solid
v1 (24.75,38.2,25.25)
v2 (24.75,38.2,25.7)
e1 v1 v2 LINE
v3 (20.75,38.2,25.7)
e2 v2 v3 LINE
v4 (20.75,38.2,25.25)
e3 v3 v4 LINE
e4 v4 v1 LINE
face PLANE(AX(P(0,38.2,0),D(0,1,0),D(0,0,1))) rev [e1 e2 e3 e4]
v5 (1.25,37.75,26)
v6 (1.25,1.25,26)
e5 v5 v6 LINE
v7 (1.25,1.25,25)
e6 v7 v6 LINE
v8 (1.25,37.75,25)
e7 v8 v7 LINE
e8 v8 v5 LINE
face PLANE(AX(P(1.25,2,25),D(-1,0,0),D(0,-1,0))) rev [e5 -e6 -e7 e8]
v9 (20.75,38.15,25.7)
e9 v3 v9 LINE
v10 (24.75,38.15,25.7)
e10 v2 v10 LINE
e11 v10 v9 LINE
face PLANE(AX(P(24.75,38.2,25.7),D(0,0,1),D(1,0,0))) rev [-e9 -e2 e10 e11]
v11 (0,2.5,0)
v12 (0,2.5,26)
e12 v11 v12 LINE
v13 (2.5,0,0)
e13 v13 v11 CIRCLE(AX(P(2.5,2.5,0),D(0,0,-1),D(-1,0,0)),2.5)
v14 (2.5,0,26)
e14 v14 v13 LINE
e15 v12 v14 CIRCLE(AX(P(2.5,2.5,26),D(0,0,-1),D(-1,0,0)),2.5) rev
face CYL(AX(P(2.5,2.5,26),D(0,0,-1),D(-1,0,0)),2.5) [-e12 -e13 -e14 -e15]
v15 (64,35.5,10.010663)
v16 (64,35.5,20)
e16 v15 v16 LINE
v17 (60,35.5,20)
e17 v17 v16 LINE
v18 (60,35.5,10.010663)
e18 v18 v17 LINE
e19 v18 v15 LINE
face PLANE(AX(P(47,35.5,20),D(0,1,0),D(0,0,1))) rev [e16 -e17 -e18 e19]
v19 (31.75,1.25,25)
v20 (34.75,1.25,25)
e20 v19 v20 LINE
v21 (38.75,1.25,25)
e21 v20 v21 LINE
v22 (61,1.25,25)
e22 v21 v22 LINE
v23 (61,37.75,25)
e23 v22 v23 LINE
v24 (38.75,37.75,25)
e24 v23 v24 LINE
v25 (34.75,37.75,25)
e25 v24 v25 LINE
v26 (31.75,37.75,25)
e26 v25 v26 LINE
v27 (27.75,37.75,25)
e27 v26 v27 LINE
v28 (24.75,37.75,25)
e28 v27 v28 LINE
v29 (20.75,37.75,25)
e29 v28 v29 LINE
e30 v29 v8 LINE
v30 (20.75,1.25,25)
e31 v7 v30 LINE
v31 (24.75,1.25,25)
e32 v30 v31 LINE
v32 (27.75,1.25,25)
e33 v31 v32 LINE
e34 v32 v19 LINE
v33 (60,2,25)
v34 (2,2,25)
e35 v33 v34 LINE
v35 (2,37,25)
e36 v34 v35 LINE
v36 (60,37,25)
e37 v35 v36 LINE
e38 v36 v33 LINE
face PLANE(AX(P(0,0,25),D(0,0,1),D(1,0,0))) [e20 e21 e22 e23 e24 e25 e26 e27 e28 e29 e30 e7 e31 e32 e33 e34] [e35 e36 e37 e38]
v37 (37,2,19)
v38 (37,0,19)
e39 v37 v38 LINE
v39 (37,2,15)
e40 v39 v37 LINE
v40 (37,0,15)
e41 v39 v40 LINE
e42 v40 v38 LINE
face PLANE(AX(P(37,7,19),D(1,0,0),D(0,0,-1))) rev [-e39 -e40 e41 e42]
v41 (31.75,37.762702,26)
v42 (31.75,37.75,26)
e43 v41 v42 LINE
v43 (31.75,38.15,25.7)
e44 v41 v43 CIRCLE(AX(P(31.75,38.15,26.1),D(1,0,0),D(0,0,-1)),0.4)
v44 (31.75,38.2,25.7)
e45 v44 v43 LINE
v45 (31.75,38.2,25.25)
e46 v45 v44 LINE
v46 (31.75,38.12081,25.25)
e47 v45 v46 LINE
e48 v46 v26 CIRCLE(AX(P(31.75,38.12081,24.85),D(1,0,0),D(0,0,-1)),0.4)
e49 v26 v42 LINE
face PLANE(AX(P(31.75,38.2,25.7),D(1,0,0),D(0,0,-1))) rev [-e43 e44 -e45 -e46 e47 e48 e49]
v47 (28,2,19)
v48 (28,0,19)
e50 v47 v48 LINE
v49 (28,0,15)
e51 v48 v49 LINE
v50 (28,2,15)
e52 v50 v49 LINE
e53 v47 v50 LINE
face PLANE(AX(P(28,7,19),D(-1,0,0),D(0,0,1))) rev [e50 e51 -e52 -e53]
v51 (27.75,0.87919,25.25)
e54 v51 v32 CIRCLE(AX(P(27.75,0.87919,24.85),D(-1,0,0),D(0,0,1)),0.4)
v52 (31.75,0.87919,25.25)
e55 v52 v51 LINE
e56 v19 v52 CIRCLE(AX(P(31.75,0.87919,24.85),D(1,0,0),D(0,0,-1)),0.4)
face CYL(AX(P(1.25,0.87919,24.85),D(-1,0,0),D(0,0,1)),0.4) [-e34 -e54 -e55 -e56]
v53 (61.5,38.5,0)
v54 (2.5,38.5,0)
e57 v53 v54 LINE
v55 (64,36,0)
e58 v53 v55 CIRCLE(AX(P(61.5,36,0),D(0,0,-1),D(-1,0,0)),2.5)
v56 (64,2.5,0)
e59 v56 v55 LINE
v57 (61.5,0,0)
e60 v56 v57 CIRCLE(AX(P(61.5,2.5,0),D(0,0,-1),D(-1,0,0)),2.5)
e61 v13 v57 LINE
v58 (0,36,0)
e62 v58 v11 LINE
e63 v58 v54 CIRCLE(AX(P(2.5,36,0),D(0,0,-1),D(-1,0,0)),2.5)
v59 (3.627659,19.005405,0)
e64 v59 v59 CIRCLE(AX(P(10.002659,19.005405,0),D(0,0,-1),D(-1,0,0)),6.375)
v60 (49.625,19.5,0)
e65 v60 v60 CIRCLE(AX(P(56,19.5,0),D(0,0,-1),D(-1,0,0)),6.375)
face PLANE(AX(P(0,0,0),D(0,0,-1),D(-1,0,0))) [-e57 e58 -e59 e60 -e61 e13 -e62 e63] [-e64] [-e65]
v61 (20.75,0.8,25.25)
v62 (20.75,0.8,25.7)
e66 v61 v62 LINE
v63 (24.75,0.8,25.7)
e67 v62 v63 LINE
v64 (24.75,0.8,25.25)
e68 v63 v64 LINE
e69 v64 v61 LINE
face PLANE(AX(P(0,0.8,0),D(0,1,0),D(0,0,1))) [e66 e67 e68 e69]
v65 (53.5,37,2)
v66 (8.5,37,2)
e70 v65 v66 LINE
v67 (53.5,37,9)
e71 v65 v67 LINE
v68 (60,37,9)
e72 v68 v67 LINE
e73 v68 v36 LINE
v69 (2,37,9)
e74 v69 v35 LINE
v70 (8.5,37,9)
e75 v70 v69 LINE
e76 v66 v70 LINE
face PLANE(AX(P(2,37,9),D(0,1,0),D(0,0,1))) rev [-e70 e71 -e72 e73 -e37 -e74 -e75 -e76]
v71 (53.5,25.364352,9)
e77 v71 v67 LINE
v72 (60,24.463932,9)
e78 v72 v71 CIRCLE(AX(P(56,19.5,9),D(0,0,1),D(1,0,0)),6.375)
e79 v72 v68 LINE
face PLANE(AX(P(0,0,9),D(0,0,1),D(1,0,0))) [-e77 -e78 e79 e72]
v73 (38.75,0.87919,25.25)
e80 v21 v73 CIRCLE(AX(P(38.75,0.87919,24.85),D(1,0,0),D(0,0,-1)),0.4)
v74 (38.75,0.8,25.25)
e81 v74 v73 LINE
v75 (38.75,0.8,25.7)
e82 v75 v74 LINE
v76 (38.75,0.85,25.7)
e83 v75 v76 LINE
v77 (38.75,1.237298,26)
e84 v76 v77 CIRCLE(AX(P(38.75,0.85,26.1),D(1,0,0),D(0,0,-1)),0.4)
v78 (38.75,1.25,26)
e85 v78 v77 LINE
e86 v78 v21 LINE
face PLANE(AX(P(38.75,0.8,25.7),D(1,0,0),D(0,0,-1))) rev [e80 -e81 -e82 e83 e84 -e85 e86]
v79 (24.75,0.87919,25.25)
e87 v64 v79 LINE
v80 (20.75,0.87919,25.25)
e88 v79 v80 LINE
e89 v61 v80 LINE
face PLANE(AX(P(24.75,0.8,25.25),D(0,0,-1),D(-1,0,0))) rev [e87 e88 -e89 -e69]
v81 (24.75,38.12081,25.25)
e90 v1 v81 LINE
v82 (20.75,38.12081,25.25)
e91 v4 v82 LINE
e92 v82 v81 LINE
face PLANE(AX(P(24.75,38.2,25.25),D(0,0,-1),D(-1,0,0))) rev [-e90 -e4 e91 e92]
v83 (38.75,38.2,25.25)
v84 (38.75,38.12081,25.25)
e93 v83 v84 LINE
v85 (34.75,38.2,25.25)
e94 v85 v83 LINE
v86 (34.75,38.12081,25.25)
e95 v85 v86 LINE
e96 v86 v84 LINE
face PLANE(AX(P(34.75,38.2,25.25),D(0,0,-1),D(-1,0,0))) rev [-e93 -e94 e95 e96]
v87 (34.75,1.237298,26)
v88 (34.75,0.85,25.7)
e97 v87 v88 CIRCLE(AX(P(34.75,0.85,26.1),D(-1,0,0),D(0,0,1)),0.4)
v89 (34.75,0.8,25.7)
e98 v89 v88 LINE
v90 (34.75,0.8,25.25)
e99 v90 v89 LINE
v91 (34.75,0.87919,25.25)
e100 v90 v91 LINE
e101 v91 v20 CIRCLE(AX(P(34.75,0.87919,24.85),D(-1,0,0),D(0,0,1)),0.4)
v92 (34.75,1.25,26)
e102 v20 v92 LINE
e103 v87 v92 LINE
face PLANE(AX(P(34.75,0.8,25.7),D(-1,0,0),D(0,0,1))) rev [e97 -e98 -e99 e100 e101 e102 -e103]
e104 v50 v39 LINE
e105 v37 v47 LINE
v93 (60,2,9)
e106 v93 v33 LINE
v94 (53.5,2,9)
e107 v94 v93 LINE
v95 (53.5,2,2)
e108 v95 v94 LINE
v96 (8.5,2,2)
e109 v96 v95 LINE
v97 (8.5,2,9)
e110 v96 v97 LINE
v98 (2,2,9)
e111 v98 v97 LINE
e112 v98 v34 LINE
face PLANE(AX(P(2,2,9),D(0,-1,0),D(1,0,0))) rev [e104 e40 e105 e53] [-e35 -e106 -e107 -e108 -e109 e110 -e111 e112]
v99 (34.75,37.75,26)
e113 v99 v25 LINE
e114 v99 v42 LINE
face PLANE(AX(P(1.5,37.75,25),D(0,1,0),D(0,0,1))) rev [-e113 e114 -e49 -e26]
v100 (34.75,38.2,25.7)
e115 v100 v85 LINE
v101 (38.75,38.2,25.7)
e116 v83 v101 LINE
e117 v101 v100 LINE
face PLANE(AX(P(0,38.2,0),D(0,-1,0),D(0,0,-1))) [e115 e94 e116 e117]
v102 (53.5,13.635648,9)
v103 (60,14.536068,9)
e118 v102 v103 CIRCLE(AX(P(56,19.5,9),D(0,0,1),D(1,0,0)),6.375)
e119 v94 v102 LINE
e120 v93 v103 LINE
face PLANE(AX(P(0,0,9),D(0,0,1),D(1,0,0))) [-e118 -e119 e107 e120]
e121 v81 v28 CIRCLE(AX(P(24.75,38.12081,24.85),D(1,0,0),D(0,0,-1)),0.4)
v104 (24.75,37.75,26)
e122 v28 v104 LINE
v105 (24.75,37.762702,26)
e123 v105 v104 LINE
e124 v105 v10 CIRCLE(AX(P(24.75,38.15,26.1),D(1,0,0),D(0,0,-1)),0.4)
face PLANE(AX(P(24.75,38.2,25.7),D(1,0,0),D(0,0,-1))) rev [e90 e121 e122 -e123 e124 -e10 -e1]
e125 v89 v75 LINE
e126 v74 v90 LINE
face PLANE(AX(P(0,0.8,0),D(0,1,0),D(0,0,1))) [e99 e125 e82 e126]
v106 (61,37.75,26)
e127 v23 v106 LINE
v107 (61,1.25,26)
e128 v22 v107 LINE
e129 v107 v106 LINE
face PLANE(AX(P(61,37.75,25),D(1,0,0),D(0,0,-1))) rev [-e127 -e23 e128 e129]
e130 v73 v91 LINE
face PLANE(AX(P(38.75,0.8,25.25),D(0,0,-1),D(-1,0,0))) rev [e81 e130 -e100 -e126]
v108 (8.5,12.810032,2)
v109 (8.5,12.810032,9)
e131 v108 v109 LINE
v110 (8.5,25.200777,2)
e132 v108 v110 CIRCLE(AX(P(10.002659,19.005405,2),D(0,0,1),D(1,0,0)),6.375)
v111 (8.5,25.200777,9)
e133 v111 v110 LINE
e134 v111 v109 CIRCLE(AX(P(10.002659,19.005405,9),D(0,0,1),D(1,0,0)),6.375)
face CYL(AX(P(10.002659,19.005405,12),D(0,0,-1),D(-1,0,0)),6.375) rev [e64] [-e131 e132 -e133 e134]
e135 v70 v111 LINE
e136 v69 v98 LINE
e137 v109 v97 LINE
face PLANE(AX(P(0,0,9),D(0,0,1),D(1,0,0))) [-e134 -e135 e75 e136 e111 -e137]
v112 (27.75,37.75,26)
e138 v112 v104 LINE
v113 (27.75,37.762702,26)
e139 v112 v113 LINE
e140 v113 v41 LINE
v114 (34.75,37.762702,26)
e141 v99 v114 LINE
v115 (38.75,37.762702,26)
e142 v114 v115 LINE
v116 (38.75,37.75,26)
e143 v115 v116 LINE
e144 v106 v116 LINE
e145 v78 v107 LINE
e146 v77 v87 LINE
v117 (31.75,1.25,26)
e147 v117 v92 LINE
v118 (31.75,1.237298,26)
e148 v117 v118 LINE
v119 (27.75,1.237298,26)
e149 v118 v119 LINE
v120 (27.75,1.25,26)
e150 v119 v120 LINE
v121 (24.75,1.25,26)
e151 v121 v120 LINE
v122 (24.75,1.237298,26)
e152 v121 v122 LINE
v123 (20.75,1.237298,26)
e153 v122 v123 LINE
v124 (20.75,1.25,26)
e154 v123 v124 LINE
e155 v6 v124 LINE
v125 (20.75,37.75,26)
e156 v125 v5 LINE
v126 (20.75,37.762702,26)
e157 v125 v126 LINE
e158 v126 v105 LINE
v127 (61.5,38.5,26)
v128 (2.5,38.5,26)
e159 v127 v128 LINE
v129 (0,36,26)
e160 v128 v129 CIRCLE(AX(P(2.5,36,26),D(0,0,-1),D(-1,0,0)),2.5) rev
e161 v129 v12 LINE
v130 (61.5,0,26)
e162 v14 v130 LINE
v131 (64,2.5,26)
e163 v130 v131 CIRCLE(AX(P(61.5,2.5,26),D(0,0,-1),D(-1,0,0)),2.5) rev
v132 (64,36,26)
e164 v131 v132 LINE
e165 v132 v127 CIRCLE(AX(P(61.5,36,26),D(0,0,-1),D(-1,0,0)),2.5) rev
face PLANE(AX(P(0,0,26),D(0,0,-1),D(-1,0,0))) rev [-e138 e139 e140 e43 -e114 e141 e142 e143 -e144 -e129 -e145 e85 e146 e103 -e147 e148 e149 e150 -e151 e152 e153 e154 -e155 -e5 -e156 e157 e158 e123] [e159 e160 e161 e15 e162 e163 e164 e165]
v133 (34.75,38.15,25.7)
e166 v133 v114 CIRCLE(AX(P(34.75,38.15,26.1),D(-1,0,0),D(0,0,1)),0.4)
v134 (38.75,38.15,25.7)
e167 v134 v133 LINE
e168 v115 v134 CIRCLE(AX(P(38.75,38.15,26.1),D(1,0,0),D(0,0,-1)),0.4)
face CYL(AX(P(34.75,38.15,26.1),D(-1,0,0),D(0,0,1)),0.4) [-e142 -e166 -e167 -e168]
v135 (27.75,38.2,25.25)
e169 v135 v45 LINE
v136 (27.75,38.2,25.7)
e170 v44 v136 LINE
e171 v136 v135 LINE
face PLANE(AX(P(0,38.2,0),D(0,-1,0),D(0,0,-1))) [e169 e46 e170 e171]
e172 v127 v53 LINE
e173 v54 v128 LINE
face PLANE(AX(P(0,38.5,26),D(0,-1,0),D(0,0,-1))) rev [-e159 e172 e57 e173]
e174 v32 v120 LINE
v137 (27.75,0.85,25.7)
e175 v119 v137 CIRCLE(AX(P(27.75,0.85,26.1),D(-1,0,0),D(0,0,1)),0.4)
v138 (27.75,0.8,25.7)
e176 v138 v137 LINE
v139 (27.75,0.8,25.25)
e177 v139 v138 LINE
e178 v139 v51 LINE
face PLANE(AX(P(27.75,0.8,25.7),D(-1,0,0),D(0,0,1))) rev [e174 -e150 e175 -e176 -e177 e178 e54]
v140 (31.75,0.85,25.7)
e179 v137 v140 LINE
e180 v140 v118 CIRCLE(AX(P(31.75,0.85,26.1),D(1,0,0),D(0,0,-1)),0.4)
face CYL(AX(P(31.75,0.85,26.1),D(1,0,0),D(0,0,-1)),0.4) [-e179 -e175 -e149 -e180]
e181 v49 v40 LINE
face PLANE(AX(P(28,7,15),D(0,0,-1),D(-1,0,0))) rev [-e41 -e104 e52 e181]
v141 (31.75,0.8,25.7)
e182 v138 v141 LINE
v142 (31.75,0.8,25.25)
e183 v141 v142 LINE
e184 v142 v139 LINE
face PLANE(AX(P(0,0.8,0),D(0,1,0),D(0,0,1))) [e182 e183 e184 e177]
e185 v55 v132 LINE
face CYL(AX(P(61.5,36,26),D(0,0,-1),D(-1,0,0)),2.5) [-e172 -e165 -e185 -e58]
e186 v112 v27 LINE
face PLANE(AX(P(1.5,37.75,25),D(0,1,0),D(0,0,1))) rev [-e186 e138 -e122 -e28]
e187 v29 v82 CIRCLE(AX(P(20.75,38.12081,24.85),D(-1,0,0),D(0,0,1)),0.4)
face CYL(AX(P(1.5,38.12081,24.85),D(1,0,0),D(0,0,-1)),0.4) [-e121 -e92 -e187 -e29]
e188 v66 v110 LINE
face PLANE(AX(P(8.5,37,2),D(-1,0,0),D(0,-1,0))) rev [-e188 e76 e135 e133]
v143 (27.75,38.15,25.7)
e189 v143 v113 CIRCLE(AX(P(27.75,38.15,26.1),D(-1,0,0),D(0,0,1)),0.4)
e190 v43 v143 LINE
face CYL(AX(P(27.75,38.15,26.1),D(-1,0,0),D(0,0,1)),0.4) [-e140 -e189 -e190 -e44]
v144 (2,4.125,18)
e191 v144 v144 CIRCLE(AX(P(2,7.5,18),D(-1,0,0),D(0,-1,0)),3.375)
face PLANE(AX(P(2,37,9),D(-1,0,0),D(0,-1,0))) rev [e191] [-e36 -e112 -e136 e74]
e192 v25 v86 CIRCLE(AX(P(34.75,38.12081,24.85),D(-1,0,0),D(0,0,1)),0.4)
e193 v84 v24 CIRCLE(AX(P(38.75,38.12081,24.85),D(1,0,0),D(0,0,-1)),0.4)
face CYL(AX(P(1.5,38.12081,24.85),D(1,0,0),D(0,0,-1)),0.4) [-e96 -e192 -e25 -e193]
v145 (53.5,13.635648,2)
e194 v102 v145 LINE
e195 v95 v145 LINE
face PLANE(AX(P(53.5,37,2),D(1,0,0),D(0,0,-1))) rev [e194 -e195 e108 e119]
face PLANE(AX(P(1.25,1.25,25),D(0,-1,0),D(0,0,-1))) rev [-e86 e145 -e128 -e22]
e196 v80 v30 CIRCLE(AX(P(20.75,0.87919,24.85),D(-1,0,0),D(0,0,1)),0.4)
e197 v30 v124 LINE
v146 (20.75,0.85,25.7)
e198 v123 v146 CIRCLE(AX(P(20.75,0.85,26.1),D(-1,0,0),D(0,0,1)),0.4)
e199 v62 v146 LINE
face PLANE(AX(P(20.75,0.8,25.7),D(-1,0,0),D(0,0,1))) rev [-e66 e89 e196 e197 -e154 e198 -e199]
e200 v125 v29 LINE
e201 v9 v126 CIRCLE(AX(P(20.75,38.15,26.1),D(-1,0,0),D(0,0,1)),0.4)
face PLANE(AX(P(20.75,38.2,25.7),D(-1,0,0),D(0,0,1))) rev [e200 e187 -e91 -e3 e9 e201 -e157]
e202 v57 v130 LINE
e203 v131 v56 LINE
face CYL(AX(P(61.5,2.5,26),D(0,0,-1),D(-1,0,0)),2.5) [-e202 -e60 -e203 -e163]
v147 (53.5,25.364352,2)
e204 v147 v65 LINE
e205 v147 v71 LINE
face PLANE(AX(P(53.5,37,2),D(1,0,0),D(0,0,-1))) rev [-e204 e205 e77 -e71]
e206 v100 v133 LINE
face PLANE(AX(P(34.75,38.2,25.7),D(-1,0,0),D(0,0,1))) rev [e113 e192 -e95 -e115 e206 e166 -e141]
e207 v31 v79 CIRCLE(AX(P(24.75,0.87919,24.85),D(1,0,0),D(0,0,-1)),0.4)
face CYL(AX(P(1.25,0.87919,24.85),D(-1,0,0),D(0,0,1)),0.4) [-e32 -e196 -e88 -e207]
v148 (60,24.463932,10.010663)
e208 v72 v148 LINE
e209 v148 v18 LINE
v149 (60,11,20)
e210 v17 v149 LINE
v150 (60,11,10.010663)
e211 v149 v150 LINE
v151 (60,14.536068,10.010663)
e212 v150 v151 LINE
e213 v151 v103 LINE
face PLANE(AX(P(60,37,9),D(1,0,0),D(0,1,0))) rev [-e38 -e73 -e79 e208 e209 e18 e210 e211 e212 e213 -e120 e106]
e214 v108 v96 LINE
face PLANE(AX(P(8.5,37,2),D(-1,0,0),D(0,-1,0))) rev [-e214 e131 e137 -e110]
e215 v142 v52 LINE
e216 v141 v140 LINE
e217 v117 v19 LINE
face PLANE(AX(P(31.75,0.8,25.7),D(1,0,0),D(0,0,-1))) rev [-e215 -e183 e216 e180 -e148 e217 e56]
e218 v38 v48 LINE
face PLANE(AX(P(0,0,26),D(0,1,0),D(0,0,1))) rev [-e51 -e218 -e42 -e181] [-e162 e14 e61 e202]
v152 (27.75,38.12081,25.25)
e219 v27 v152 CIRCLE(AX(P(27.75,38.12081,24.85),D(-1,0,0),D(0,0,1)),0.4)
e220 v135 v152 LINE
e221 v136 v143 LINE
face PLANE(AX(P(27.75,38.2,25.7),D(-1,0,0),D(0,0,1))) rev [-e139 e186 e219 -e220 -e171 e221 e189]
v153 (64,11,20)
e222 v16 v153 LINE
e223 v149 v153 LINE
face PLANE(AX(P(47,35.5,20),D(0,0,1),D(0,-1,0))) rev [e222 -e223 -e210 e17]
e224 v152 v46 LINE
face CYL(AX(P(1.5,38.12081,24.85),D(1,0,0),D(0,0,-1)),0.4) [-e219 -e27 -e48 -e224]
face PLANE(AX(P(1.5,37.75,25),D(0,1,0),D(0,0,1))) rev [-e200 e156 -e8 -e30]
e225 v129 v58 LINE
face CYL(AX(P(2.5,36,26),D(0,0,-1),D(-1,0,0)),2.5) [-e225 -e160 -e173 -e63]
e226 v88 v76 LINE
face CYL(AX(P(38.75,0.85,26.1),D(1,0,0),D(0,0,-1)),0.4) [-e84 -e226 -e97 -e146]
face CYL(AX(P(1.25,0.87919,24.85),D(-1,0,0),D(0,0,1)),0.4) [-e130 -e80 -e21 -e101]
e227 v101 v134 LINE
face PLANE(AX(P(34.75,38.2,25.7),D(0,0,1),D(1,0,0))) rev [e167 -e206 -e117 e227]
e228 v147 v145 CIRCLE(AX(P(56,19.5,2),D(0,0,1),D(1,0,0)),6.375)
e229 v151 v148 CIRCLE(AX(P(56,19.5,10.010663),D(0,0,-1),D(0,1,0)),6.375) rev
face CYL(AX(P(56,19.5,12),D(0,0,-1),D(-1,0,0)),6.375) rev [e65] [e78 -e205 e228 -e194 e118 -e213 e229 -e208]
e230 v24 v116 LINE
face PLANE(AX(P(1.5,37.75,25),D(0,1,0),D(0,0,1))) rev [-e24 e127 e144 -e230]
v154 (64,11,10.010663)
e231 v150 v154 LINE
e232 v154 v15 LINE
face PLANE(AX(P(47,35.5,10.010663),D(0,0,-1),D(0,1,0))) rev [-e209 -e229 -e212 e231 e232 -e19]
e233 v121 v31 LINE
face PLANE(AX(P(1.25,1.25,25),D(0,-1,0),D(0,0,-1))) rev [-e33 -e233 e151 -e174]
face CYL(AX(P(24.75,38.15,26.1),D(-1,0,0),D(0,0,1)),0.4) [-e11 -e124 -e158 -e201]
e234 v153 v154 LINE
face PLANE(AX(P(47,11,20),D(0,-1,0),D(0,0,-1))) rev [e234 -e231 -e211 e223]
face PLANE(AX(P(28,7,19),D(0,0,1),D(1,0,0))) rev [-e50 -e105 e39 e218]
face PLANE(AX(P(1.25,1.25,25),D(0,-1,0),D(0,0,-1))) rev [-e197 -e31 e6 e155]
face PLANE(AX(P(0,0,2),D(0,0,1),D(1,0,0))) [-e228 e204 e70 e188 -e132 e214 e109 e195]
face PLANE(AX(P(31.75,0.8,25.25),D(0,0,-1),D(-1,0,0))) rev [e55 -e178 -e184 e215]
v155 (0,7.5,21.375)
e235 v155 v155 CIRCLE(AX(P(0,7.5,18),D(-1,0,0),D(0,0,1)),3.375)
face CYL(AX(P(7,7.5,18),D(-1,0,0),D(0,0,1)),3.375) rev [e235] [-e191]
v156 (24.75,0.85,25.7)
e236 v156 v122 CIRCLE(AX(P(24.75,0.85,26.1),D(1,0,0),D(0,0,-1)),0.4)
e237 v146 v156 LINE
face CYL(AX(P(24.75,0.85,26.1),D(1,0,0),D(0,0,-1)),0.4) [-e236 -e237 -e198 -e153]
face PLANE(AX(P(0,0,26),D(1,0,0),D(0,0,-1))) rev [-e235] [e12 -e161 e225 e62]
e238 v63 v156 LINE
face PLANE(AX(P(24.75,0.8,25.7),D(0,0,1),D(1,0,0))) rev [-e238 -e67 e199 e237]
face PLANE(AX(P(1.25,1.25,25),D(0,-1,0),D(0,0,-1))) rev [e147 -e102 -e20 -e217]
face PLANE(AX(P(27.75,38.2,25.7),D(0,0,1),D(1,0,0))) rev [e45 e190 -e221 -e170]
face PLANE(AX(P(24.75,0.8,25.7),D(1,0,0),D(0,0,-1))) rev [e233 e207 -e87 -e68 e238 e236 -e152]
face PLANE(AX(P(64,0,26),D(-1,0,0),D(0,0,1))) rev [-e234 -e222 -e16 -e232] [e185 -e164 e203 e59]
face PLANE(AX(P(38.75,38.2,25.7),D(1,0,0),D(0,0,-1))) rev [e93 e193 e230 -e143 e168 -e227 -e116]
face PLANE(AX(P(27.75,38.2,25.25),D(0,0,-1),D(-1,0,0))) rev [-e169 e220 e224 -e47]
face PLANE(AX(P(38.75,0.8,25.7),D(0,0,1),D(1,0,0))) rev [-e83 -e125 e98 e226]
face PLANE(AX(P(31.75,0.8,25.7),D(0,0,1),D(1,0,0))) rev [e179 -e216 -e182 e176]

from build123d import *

# Parameters (mm, degrees)
SKETCH1_W           = 64
SKETCH1_H           = 38.5
BOSS_EXTRUDE1_DEPTH = 26
SKETCH2_W           = 58
SKETCH2_H           = 35
CUT_EXTRUDE1_DEPTH  = 17
SKETCH4_W           = 45
SKETCH4_H           = 35
CUT_EXTRUDE3_DEPTH  = 7
SKETCH5_R           = 6.375
CUT_EXTRUDE4_DEPTH  = 12
SKETCH6_W           = 9.989337028
SKETCH6_H           = 24.5
CUT_EXTRUDE5_DEPTH  = 17
SKETCH7_R           = 3.375
CUT_EXTRUDE6_DEPTH  = 7
SKETCH8_W           = 9
SKETCH8_H           = 4
CUT_EXTRUDE7_DEPTH  = 7
FILLET1_R           = 2.5
SKETCH10_W          = 59.5
SKETCH10_H          = 0.75
CUT_EXTRUDE8_DEPTH  = 1
SKETCH11_W          = 59.75
SKETCH11_H          = 0.75
CUT_EXTRUDE9_DEPTH  = 1
SKETCH12_W          = 1
SKETCH12_H          = 36.5
SKETCH12_W_2        = 0.75
CUT_EXTRUDE10_DEPTH = 1
SKETCH13_W          = 4
SKETCH13_H          = 0.45
CUT_EXTRUDE11_DEPTH = 0.45
FILLET2_R           = 0.4
SKETCH14_W          = 4
SKETCH14_H          = 0.45
CUT_EXTRUDE12_DEPTH = 0.45
FILLET3_R           = 0.4


with BuildPart() as part:
    # Sketch1 → Boss-Extrude1 (new body)
    with BuildSketch(Plane.XY):
        with Locations((32, 19.25)):
            Rectangle(SKETCH1_W, SKETCH1_H)
    extrude(amount=BOSS_EXTRUDE1_DEPTH)

    # Sketch2 → Cut-Extrude1 (cut)
    with BuildSketch(Plane.XY.offset(26)):
        with Locations((31, 19.5)):
            Rectangle(SKETCH2_W, SKETCH2_H)
    extrude(amount=-CUT_EXTRUDE1_DEPTH, mode=Mode.SUBTRACT)

    # Sketch4 → Cut-Extrude3 (cut)
    with BuildSketch(Plane.XY.offset(9)):
        with Locations((31, 19.5)):
            Rectangle(SKETCH4_W, SKETCH4_H)
    extrude(amount=-CUT_EXTRUDE3_DEPTH, mode=Mode.SUBTRACT)

    # Sketch5 → Cut-Extrude4 (cut)
    with BuildSketch(Plane(origin=(0, 0, 0), x_dir=(-1, 0, 0), z_dir=(0, 0, -1))):
        with Locations((-56, 19.5)):
            Circle(SKETCH5_R)
        with Locations((-10.002659036, 19.005404936)):
            Circle(SKETCH5_R)
    extrude(amount=-CUT_EXTRUDE4_DEPTH, mode=Mode.SUBTRACT)

    # Sketch6 → Cut-Extrude5 (cut)
    with BuildSketch(Plane(origin=(64, 0, 0), x_dir=(0, 0, -1), z_dir=(1, 0, 0))):
        with Locations((-15.005331486, 23.25)):
            Rectangle(SKETCH6_W, SKETCH6_H)
    extrude(amount=-CUT_EXTRUDE5_DEPTH, mode=Mode.SUBTRACT)

    # Sketch7 → Cut-Extrude6 (cut)
    with BuildSketch(Plane.ZY):
        with Locations((18, 7.5)):
            Circle(SKETCH7_R)
    extrude(amount=-CUT_EXTRUDE6_DEPTH, mode=Mode.SUBTRACT)

    # Sketch8 → Cut-Extrude7 (cut)
    with BuildSketch(Plane.XZ):
        with Locations((32.5, 17)):
            Rectangle(SKETCH8_W, SKETCH8_H)
    extrude(amount=-CUT_EXTRUDE7_DEPTH, mode=Mode.SUBTRACT)

    # Fillet1
    fillet1_edges = [part.edges().sort_by_distance(p)[0] for p in [
        (0, 38.5, 13),
        (64, 38.5, 13),
        (64, 0, 13),
        (0, 0, 13),
    ]]
    fillet(fillet1_edges, radius=FILLET1_R)

    # Sketch10 → Cut-Extrude8 (cut)
    with BuildSketch(Plane.XY.offset(26)):
        with Locations((31.25, 37.375)):
            Rectangle(SKETCH10_W, SKETCH10_H)
    extrude(amount=-CUT_EXTRUDE8_DEPTH, mode=Mode.SUBTRACT)

    # Sketch11 → Cut-Extrude9 (cut)
    with BuildSketch(Plane.XY.offset(26)):
        with Locations((31.125, 1.625)):
            Rectangle(SKETCH11_W, SKETCH11_H)
    extrude(amount=-CUT_EXTRUDE9_DEPTH, mode=Mode.SUBTRACT)

    # Sketch12 → Cut-Extrude10 (cut)
    with BuildSketch(Plane.XY.offset(26)):
        with Locations((60.5, 19.5)):
            Rectangle(SKETCH12_W, SKETCH12_H)
        with Locations((1.625, 19.5)):
            Rectangle(SKETCH12_W_2, SKETCH12_H)
    extrude(amount=-CUT_EXTRUDE10_DEPTH, mode=Mode.SUBTRACT)

    # Sketch13 → Cut-Extrude11 (cut)
    with BuildSketch(Plane(origin=(0, 1.25, 0), x_dir=(1, 0, 0), z_dir=(0, 1, 0))):
        with Locations((29.75, -25.475)):
            Rectangle(SKETCH13_W, SKETCH13_H)
        with Locations((22.75, -25.475)):
            Rectangle(SKETCH13_W, SKETCH13_H)
        with Locations((36.75, -25.475)):
            Rectangle(SKETCH13_W, SKETCH13_H)
    extrude(amount=-CUT_EXTRUDE11_DEPTH, mode=Mode.SUBTRACT)

    # Fillet2
    # the kernel refuses this fillet: 0.4 mm, written as the material it takes off along each edge
    with BuildSketch(Plane(origin=(34.75, 1.25, 25.25), x_dir=(0, 0, -1), z_dir=(1, 0, 0)), Plane(origin=(20.75, 1.25, 25.25), x_dir=(0, 0, -1), z_dir=(1, 0, 0)), Plane(origin=(27.75, 1.25, 25.25), x_dir=(0, 0, -1), z_dir=(1, 0, 0))) as fillet2_piece_1:
        with BuildLine():
            CenterArc((0.4, -0.370809924), FILLET2_R, 112.024312837, 67.975687163)
            Line((0, -0.370809924), (0, 0))
            Line((0, 0), (0.25, 0))
        make_face()
    extrude(amount=4, mode=Mode.SUBTRACT)
    with BuildSketch(Plane(origin=(38.75, 1.25, 25.7), x_dir=(0, 0, 1), z_dir=(-1, 0, 0)), Plane(origin=(24.75, 1.25, 25.7), x_dir=(0, 0, 1), z_dir=(-1, 0, 0)), Plane(origin=(31.75, 1.25, 25.7), x_dir=(0, 0, 1), z_dir=(-1, 0, 0))) as fillet2_piece_2:
        with BuildLine():
            CenterArc((FILLET2_R, -FILLET2_R), FILLET2_R, 90, 90)
            Line((0, -FILLET2_R), (0, 0))
            Line((0, 0), (FILLET2_R, 0))
        make_face()
    extrude(amount=4, mode=Mode.SUBTRACT)

    # Sketch14 → Cut-Extrude12 (cut)
    with BuildSketch(Plane.XZ.offset(-37.75)):
        with Locations((29.75, 25.475)):
            Rectangle(SKETCH14_W, SKETCH14_H)
        with Locations((36.75, 25.475)):
            Rectangle(SKETCH14_W, SKETCH14_H)
        with Locations((22.75, 25.475)):
            Rectangle(SKETCH14_W, SKETCH14_H)
    extrude(amount=-CUT_EXTRUDE12_DEPTH, mode=Mode.SUBTRACT)

    # Fillet3
    # the kernel refuses this fillet: 0.4 mm, written as the material it takes off along each edge
    with BuildSketch(Plane(origin=(24.75, 37.75, 25.7), x_dir=(0, 0, 1), z_dir=(-1, 0, 0))) as fillet3_piece_1:
        with BuildLine():
            CenterArc((FILLET3_R, FILLET3_R), FILLET3_R, 180, 90)
            Line((0, FILLET3_R), (0, 0))
            Line((0, 0), (FILLET3_R, 0))
        make_face()
    extrude(amount=4, mode=Mode.SUBTRACT)
    with BuildSketch(Plane(origin=(20.75, 37.75, 25.25), x_dir=(0, 0, -1), z_dir=(1, 0, 0))) as fillet3_piece_2:
        with BuildLine():
            CenterArc((0.4, 0.370809924), FILLET3_R, 180, 67.975687163)
            Line((0, 0.370809924), (0, 0))
            Line((0, 0), (0.25, 0))
        make_face()
    extrude(amount=4, mode=Mode.SUBTRACT)
    with BuildSketch(Plane(origin=(38.75, 37.75, 25.25), x_dir=(0, 0, -1), z_dir=(-1, 0, 0)), Plane(origin=(31.75, 37.75, 25.25), x_dir=(0, 0, -1), z_dir=(-1, 0, 0))) as fillet3_piece_3:
        with BuildLine():
            CenterArc((0.4, -0.370809924), FILLET3_R, 112.024312837, 67.975687163)
            Line((0, -0.370809924), (0, 0))
            Line((0, 0), (0.25, 0))
        make_face()
    extrude(amount=4, mode=Mode.SUBTRACT)
    with BuildSketch(Plane(origin=(34.75, 37.75, 25.7), x_dir=(0, 0, 1), z_dir=(1, 0, 0)), Plane(origin=(27.75, 37.75, 25.7), x_dir=(0, 0, 1), z_dir=(1, 0, 0))) as fillet3_piece_4:
        with BuildLine():
            CenterArc((FILLET3_R, -FILLET3_R), FILLET3_R, 90, 90)
            Line((0, -FILLET3_R), (0, 0))
            Line((0, 0), (FILLET3_R, 0))
        make_face()
    extrude(amount=4, mode=Mode.SUBTRACT)


solid = part.part
